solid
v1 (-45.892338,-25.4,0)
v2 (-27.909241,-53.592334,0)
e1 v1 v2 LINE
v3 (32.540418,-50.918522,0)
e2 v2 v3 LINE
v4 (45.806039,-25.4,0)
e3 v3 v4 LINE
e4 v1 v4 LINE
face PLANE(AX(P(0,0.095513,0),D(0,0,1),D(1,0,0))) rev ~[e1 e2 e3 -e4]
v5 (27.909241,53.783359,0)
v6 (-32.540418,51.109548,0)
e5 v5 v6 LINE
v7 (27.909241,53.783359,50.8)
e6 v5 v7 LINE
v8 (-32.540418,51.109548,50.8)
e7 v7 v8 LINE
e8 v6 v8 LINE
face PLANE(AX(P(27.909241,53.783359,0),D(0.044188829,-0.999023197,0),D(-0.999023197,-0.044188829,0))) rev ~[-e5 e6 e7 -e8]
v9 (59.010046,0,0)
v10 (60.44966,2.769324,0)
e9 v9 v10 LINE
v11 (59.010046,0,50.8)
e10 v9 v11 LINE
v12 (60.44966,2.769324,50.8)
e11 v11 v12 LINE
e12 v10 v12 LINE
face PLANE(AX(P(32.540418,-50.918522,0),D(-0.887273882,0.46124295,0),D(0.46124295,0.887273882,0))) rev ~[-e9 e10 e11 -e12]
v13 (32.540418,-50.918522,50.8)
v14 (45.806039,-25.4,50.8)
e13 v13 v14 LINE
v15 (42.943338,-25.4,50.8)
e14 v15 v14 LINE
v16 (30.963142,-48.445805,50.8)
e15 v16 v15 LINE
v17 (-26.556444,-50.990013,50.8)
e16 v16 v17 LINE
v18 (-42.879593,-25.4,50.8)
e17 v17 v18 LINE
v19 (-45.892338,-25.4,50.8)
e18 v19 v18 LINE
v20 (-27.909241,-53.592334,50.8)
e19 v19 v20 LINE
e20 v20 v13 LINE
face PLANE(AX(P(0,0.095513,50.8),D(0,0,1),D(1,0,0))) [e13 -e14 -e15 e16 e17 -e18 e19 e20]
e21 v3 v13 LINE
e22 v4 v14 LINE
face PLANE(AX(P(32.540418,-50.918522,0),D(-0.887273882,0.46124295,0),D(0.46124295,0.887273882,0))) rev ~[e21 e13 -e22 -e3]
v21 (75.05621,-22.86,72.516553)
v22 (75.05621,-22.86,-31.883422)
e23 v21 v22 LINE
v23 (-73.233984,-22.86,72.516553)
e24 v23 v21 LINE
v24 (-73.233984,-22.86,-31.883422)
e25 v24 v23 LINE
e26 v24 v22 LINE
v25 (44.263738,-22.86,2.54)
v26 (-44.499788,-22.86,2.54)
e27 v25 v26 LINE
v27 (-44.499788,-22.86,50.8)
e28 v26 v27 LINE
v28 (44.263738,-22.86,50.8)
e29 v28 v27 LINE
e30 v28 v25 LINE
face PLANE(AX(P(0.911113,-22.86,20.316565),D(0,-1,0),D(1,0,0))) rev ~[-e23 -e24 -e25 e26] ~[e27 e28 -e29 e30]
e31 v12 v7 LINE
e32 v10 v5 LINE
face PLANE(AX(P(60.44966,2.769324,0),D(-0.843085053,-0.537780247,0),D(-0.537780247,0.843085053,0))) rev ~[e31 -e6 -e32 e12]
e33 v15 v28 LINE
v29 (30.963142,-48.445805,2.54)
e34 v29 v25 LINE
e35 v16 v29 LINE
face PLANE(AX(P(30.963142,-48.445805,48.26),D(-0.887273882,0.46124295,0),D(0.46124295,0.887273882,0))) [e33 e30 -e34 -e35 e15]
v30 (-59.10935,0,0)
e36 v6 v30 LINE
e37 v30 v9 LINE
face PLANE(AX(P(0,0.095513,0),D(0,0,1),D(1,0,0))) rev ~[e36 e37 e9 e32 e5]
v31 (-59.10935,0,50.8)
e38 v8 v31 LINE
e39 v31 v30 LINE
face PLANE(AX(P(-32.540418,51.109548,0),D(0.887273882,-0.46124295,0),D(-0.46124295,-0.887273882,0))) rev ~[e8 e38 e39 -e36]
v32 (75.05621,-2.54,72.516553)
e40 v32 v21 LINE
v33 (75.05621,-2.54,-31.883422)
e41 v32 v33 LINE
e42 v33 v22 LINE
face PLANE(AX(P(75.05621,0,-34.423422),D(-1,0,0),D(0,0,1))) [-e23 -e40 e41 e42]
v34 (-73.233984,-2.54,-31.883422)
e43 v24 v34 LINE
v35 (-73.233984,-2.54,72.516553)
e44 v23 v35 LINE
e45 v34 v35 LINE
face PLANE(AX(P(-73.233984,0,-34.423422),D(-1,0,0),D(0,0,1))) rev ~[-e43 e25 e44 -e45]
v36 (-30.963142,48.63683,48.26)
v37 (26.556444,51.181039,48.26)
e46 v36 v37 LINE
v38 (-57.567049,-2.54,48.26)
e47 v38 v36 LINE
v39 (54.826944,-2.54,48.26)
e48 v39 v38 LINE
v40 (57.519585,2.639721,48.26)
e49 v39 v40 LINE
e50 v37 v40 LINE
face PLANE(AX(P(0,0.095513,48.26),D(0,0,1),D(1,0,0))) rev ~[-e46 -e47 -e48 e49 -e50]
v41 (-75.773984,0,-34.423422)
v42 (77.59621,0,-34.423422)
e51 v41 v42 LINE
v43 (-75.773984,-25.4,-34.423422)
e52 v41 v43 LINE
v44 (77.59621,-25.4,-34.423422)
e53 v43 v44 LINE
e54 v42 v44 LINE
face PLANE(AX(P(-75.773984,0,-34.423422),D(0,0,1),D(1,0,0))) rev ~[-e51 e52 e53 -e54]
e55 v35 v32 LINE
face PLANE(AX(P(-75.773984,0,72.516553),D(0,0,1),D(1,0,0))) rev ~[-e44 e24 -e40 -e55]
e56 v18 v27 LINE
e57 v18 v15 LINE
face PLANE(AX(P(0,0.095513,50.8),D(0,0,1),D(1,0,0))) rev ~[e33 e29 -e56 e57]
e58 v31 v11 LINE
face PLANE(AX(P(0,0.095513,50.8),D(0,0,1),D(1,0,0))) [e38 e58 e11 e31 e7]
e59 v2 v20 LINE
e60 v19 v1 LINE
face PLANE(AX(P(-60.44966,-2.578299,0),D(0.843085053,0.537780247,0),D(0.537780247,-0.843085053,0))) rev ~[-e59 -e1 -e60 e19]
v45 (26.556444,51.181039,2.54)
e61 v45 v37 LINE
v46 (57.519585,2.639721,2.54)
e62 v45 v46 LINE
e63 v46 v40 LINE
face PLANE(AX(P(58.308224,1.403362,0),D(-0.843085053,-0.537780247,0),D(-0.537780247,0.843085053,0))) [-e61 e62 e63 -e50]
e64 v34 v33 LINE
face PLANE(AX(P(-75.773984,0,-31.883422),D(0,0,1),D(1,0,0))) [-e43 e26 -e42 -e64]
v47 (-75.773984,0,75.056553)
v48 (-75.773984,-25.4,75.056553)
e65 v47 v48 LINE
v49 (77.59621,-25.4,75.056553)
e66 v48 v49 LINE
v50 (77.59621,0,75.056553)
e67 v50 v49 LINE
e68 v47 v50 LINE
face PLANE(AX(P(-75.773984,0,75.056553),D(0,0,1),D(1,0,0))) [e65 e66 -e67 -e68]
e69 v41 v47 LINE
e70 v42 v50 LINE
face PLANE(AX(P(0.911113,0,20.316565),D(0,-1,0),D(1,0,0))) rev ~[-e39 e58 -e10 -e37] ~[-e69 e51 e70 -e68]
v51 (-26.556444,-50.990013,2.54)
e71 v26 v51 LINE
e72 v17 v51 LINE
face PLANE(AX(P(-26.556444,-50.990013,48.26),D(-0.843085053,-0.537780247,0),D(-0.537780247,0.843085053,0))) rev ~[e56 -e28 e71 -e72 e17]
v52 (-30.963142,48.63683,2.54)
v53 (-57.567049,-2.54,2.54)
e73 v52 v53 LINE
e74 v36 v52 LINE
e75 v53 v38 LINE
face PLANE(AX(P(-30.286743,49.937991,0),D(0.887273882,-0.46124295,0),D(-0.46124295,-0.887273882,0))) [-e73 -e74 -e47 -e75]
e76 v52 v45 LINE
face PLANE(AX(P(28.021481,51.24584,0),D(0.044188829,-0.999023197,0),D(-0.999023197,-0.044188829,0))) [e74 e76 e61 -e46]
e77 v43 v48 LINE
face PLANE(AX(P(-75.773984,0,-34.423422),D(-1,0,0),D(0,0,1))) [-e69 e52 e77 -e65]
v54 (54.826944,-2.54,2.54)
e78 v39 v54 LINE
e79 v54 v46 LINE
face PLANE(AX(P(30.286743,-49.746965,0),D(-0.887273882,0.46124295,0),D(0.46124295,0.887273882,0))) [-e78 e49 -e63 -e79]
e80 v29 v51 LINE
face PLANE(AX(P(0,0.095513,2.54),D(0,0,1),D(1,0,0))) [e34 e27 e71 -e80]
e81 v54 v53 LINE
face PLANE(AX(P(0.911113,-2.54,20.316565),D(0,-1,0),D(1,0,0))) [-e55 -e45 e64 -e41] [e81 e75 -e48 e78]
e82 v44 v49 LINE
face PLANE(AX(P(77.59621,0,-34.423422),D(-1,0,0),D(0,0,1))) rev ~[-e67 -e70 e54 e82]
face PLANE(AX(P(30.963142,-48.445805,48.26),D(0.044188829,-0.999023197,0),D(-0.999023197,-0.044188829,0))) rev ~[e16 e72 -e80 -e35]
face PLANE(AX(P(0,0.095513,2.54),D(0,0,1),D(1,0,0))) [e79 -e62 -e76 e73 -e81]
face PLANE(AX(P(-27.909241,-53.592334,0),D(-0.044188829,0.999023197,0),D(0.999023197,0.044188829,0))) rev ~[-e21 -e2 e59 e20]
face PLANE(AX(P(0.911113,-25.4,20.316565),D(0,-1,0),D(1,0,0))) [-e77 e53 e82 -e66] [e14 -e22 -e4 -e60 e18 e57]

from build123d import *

# Parameters (mm, degrees)
F1_DEPTH = 50.8
F2_W     = 153.3701941371
F2_H     = 109.4799749553
F3_DEPTH = 25.4
F4_T     = -2.54


# Not quite as in the source:
# - a shell that OpenCascade refuses in one call is made with other operations: the cavity is built on its own and cut out


with BuildPart() as f1:
    # F0 (on Top) → F1 (new body)
    with BuildSketch(Plane.XY):
        Polygon((32.5404184413, -50.9185224387), (60.4496595907, 2.769324145), (27.9092411494, 53.7833592726), (-32.5404184413, 51.1095478164), (-60.4496595907, -2.5782987673), (-27.9092411494, -53.5923338949), align=None)
    extrude(amount=F1_DEPTH)

    # F2 (on Front) → F3 (join)
    with BuildSketch(Plane.XZ):
        with Locations((0.9111128747, 20.3165654093)):
            Rectangle(F2_W, F2_H)
    extrude(amount=F3_DEPTH)

    # F4: a shell. OpenCascade refuses it in one call, so the cavity is built on its own and cut out:
    # the body offset inwards by the wall thickness, plus a prism from it out through each open face.
    f4_core = offset(f1.part, amount=F4_T, kind=Kind.INTERSECTION, mode=Mode.PRIVATE)
    f4_exits = [f4_core.faces().sort_by_distance(p)[0] for p in [
        (0.261081, -35.353201, 48.26),
    ]]
    add(f4_core, mode=Mode.SUBTRACT)
    extrude(f4_exits, amount=-F4_T, mode=Mode.SUBTRACT)


solid = f1.part
